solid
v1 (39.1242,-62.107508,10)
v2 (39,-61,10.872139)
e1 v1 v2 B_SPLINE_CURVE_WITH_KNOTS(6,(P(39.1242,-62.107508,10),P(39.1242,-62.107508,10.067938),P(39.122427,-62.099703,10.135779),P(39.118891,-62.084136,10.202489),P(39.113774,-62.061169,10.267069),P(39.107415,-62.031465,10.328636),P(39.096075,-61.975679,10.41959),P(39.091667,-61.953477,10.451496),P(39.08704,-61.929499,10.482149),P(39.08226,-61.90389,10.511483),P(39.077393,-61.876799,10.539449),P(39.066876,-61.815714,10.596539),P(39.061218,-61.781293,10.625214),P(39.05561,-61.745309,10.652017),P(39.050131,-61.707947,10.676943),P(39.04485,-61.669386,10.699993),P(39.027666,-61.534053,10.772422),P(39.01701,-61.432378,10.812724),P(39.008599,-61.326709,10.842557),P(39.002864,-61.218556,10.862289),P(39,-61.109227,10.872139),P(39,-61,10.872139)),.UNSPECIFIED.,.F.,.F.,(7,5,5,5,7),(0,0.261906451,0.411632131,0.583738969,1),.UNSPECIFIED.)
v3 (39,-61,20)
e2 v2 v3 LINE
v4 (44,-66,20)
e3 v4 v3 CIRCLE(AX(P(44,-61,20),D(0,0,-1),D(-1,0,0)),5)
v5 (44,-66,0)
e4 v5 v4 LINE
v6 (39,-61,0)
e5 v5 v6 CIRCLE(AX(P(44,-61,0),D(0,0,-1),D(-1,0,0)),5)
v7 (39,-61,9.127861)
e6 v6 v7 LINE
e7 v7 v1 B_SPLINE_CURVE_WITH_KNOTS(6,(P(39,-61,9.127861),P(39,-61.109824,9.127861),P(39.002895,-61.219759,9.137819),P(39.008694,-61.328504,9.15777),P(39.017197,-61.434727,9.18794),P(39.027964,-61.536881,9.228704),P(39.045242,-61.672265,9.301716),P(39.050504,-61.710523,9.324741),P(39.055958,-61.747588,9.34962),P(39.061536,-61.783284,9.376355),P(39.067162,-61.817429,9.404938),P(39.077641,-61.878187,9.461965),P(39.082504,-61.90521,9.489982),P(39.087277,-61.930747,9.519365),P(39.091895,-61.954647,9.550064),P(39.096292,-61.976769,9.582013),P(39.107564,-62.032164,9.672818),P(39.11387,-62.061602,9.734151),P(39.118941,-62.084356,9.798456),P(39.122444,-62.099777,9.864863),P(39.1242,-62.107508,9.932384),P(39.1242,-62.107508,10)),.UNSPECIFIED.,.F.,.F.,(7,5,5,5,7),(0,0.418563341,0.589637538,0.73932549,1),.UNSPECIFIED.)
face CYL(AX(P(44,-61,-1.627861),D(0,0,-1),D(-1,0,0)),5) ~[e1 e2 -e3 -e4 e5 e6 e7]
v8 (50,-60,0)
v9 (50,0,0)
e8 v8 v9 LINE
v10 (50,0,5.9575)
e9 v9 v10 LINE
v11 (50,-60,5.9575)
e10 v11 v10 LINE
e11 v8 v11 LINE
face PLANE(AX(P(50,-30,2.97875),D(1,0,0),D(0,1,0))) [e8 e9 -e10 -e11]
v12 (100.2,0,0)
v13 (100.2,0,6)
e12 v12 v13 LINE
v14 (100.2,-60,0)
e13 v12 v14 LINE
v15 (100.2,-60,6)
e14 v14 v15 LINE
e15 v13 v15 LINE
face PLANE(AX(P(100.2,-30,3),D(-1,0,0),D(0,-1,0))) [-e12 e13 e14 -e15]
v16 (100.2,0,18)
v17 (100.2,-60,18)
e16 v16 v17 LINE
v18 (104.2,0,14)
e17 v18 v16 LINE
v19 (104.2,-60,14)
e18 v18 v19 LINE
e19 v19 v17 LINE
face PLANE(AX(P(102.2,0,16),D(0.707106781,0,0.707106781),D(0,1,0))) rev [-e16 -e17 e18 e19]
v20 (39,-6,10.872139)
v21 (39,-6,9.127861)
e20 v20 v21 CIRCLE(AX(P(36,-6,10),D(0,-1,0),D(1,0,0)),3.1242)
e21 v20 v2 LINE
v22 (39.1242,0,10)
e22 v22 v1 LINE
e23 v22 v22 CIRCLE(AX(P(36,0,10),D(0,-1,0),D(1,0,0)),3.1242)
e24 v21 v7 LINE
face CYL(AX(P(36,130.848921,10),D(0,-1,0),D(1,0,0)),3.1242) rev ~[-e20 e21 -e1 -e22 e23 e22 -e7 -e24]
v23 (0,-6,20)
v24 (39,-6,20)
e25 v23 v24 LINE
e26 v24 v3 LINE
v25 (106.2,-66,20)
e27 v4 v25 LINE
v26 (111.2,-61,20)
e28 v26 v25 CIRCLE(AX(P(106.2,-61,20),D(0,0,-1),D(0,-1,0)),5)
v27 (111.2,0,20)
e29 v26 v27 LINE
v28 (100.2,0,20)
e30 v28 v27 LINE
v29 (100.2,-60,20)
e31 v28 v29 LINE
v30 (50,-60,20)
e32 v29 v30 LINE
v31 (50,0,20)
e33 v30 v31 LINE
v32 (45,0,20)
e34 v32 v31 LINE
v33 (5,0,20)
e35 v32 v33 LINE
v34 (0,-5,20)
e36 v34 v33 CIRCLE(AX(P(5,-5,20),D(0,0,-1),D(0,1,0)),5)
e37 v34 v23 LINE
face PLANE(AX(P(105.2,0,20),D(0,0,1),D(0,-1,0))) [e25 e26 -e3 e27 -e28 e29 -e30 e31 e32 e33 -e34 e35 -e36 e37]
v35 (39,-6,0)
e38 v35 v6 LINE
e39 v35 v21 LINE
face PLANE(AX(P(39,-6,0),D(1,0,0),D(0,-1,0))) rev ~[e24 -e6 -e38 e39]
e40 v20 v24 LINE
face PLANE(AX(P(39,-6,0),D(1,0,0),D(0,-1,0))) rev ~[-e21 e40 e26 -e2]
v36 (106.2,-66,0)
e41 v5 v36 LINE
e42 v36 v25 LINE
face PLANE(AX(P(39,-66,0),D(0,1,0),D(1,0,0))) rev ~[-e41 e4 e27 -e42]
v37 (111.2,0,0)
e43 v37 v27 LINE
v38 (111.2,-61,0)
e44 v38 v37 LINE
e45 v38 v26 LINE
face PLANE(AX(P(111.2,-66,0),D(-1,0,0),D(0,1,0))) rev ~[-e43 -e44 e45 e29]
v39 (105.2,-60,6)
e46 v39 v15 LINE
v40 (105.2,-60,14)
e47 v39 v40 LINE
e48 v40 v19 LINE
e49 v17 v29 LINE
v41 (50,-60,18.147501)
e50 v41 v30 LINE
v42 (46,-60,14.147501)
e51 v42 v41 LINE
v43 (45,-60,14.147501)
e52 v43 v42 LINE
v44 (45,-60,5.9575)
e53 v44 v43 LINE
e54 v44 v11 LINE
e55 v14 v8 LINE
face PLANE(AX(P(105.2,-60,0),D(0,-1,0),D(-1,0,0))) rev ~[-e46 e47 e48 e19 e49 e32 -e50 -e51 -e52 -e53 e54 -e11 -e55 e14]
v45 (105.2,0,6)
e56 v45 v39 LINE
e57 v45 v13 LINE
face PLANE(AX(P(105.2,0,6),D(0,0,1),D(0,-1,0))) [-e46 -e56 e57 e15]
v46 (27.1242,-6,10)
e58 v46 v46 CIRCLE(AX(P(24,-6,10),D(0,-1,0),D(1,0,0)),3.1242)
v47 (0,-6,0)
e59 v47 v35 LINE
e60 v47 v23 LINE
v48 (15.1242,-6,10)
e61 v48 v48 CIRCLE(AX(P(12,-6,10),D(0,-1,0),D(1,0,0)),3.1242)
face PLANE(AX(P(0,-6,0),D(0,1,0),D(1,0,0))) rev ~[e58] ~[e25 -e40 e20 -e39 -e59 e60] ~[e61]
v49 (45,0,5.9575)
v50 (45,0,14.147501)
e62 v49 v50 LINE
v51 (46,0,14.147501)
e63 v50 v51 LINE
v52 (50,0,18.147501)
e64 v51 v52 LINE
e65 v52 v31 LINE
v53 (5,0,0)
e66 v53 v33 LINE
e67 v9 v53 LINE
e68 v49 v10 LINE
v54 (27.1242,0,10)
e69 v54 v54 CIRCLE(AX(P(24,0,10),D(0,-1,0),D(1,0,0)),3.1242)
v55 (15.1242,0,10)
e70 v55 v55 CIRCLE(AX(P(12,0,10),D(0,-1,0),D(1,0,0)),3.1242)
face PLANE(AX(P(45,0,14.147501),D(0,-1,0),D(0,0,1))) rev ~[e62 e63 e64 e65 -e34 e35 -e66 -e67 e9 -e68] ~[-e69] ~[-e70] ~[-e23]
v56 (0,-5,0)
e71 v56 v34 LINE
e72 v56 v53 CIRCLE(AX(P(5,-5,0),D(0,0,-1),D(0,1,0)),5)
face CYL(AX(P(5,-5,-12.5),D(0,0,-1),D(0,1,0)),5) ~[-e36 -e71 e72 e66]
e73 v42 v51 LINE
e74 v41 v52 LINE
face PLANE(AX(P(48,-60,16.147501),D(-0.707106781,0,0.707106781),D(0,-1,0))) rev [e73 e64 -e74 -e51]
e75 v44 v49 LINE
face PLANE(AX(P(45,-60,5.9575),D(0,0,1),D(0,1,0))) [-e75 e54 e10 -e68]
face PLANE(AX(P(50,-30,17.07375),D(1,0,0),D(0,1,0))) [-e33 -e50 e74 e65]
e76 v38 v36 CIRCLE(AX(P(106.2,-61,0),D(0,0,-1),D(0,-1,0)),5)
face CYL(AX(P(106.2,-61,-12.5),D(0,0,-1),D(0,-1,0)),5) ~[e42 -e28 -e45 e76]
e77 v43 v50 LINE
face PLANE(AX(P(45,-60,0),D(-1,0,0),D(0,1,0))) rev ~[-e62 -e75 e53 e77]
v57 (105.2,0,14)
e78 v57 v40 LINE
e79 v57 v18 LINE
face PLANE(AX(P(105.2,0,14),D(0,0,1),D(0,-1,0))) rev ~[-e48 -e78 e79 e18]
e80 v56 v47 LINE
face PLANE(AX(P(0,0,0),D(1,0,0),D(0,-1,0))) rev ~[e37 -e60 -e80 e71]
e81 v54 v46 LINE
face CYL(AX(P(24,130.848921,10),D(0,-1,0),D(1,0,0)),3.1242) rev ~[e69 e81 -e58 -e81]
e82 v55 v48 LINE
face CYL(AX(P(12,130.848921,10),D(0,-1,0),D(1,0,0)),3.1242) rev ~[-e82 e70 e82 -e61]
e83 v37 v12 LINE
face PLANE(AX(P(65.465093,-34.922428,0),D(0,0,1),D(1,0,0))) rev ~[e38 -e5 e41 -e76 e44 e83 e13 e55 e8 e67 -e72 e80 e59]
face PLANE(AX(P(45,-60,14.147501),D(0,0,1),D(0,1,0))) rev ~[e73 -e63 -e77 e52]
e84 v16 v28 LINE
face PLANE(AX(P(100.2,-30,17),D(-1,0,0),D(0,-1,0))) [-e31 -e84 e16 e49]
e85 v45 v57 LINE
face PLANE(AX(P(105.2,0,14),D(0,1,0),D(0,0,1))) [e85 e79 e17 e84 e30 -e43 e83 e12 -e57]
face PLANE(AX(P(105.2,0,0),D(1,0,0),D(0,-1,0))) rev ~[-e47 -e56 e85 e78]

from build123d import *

# Parameters (mm, degrees)
F1_DEPTH    = 20
F3_D        = 6.2484
F4_W        = 60
F4_H        = 6
F6_DEPTH    = 5
F5_W        = 60
F5_H        = 5.8524994925
F5_H_2      = 5.9575000778
F7_DEPTH    = 5
F8_SIZE     = 4
F9_T1_DEPTH = 45
F9_T3_DEPTH = 34.127861456
F9_T5_DEPTH = 34.127861456


# Not quite as in the source:
# - a fillet or chamfer that OpenCascade refuses, or shapes differently, is made with other operations: its cross-section is extruded or revolved along the edge and cut away or added


with BuildPart() as f1:
    # F0 (on Top) → F1 (new body)
    with BuildSketch(Plane.XY):
        Polygon((45, 0), (0, 0), (0, -6), (39, -6), (39, -66), (111.2, -66), (111.2, 0), (105.2, 0), (105.2, -60), (45, -60), align=None)
    extrude(amount=F1_DEPTH)

    # F3 (through all)
    with Locations(Plane(origin=(0, 0, 0), x_dir=(-1, 0, 0), z_dir=(0, 1, 0))):
        with Locations((-36, 10), (-24, 10), (-12, 10)):
            Hole(F3_D / 2)

    # F4 (on face) → F6 (join)
    with BuildSketch(Plane(origin=(105.2, 0, 0), x_dir=(0, -1, 0), z_dir=(-1, 0, 0))):
        with Locations((30, 17)):
            Rectangle(F4_W, F4_H)
        with Locations((30, 3)):
            Rectangle(F4_W, F4_H)
    extrude(amount=F6_DEPTH)

    # F5 (on face) → F7 (join)
    with BuildSketch(Plane.YZ.offset(45)):
        with Locations((-30, 17.0737502538)):
            Rectangle(F5_W, F5_H)
        with Locations((-30, 2.9787500389)):
            Rectangle(F5_W, F5_H_2)
    extrude(amount=F7_DEPTH)

    # F8
    f8_edges = [f1.edges().sort_by_distance(p)[0] for p in [
        (50, -30, 14.147501),
        (100.2, -30, 14),
    ]]
    chamfer(f8_edges, length=F8_SIZE)

    # F9: fillet of radius 5 on 4 edges, made by hand

    # F9_s2 → F9_t1 (cut)
    with BuildSketch(Plane.XY.offset(-12.5)):
        with BuildLine():
            ThreePointArc((106.2, -66), (109.7355339059, -64.5355339059), (111.2, -61))
            Line((111.2, -61), (111.2, -66))
            Line((111.2, -66), (106.2, -66))
        make_face()
        with BuildLine():
            ThreePointArc((5, 0), (1.4644660941, -1.4644660941), (0, -5))
            Line((0, -5), (0, 0))
            Line((0, 0), (5, 0))
        make_face()
    extrude(amount=F9_T1_DEPTH, mode=Mode.SUBTRACT)

    # F9_s4 → F9_t3 (cut)
    with BuildSketch(Plane.XY.offset(-1.627861456)):
        with BuildLine():
            ThreePointArc((39, -61), (40.4644660941, -64.5355339059), (44, -66))
            Line((44, -66), (39, -66))
            Line((39, -66), (39, -61))
        make_face()
    extrude(amount=F9_T3_DEPTH, mode=Mode.SUBTRACT)

    # F9_s6 → F9_t5 (cut)
    with BuildSketch(Plane.XY.offset(-12.5)):
        with BuildLine():
            ThreePointArc((44, -66), (40.4644660941, -64.5355339059), (39, -61))
            Line((39, -61), (39, -66))
            Line((39, -66), (44, -66))
        make_face()
    extrude(amount=F9_T5_DEPTH, mode=Mode.SUBTRACT)


solid = f1.part
